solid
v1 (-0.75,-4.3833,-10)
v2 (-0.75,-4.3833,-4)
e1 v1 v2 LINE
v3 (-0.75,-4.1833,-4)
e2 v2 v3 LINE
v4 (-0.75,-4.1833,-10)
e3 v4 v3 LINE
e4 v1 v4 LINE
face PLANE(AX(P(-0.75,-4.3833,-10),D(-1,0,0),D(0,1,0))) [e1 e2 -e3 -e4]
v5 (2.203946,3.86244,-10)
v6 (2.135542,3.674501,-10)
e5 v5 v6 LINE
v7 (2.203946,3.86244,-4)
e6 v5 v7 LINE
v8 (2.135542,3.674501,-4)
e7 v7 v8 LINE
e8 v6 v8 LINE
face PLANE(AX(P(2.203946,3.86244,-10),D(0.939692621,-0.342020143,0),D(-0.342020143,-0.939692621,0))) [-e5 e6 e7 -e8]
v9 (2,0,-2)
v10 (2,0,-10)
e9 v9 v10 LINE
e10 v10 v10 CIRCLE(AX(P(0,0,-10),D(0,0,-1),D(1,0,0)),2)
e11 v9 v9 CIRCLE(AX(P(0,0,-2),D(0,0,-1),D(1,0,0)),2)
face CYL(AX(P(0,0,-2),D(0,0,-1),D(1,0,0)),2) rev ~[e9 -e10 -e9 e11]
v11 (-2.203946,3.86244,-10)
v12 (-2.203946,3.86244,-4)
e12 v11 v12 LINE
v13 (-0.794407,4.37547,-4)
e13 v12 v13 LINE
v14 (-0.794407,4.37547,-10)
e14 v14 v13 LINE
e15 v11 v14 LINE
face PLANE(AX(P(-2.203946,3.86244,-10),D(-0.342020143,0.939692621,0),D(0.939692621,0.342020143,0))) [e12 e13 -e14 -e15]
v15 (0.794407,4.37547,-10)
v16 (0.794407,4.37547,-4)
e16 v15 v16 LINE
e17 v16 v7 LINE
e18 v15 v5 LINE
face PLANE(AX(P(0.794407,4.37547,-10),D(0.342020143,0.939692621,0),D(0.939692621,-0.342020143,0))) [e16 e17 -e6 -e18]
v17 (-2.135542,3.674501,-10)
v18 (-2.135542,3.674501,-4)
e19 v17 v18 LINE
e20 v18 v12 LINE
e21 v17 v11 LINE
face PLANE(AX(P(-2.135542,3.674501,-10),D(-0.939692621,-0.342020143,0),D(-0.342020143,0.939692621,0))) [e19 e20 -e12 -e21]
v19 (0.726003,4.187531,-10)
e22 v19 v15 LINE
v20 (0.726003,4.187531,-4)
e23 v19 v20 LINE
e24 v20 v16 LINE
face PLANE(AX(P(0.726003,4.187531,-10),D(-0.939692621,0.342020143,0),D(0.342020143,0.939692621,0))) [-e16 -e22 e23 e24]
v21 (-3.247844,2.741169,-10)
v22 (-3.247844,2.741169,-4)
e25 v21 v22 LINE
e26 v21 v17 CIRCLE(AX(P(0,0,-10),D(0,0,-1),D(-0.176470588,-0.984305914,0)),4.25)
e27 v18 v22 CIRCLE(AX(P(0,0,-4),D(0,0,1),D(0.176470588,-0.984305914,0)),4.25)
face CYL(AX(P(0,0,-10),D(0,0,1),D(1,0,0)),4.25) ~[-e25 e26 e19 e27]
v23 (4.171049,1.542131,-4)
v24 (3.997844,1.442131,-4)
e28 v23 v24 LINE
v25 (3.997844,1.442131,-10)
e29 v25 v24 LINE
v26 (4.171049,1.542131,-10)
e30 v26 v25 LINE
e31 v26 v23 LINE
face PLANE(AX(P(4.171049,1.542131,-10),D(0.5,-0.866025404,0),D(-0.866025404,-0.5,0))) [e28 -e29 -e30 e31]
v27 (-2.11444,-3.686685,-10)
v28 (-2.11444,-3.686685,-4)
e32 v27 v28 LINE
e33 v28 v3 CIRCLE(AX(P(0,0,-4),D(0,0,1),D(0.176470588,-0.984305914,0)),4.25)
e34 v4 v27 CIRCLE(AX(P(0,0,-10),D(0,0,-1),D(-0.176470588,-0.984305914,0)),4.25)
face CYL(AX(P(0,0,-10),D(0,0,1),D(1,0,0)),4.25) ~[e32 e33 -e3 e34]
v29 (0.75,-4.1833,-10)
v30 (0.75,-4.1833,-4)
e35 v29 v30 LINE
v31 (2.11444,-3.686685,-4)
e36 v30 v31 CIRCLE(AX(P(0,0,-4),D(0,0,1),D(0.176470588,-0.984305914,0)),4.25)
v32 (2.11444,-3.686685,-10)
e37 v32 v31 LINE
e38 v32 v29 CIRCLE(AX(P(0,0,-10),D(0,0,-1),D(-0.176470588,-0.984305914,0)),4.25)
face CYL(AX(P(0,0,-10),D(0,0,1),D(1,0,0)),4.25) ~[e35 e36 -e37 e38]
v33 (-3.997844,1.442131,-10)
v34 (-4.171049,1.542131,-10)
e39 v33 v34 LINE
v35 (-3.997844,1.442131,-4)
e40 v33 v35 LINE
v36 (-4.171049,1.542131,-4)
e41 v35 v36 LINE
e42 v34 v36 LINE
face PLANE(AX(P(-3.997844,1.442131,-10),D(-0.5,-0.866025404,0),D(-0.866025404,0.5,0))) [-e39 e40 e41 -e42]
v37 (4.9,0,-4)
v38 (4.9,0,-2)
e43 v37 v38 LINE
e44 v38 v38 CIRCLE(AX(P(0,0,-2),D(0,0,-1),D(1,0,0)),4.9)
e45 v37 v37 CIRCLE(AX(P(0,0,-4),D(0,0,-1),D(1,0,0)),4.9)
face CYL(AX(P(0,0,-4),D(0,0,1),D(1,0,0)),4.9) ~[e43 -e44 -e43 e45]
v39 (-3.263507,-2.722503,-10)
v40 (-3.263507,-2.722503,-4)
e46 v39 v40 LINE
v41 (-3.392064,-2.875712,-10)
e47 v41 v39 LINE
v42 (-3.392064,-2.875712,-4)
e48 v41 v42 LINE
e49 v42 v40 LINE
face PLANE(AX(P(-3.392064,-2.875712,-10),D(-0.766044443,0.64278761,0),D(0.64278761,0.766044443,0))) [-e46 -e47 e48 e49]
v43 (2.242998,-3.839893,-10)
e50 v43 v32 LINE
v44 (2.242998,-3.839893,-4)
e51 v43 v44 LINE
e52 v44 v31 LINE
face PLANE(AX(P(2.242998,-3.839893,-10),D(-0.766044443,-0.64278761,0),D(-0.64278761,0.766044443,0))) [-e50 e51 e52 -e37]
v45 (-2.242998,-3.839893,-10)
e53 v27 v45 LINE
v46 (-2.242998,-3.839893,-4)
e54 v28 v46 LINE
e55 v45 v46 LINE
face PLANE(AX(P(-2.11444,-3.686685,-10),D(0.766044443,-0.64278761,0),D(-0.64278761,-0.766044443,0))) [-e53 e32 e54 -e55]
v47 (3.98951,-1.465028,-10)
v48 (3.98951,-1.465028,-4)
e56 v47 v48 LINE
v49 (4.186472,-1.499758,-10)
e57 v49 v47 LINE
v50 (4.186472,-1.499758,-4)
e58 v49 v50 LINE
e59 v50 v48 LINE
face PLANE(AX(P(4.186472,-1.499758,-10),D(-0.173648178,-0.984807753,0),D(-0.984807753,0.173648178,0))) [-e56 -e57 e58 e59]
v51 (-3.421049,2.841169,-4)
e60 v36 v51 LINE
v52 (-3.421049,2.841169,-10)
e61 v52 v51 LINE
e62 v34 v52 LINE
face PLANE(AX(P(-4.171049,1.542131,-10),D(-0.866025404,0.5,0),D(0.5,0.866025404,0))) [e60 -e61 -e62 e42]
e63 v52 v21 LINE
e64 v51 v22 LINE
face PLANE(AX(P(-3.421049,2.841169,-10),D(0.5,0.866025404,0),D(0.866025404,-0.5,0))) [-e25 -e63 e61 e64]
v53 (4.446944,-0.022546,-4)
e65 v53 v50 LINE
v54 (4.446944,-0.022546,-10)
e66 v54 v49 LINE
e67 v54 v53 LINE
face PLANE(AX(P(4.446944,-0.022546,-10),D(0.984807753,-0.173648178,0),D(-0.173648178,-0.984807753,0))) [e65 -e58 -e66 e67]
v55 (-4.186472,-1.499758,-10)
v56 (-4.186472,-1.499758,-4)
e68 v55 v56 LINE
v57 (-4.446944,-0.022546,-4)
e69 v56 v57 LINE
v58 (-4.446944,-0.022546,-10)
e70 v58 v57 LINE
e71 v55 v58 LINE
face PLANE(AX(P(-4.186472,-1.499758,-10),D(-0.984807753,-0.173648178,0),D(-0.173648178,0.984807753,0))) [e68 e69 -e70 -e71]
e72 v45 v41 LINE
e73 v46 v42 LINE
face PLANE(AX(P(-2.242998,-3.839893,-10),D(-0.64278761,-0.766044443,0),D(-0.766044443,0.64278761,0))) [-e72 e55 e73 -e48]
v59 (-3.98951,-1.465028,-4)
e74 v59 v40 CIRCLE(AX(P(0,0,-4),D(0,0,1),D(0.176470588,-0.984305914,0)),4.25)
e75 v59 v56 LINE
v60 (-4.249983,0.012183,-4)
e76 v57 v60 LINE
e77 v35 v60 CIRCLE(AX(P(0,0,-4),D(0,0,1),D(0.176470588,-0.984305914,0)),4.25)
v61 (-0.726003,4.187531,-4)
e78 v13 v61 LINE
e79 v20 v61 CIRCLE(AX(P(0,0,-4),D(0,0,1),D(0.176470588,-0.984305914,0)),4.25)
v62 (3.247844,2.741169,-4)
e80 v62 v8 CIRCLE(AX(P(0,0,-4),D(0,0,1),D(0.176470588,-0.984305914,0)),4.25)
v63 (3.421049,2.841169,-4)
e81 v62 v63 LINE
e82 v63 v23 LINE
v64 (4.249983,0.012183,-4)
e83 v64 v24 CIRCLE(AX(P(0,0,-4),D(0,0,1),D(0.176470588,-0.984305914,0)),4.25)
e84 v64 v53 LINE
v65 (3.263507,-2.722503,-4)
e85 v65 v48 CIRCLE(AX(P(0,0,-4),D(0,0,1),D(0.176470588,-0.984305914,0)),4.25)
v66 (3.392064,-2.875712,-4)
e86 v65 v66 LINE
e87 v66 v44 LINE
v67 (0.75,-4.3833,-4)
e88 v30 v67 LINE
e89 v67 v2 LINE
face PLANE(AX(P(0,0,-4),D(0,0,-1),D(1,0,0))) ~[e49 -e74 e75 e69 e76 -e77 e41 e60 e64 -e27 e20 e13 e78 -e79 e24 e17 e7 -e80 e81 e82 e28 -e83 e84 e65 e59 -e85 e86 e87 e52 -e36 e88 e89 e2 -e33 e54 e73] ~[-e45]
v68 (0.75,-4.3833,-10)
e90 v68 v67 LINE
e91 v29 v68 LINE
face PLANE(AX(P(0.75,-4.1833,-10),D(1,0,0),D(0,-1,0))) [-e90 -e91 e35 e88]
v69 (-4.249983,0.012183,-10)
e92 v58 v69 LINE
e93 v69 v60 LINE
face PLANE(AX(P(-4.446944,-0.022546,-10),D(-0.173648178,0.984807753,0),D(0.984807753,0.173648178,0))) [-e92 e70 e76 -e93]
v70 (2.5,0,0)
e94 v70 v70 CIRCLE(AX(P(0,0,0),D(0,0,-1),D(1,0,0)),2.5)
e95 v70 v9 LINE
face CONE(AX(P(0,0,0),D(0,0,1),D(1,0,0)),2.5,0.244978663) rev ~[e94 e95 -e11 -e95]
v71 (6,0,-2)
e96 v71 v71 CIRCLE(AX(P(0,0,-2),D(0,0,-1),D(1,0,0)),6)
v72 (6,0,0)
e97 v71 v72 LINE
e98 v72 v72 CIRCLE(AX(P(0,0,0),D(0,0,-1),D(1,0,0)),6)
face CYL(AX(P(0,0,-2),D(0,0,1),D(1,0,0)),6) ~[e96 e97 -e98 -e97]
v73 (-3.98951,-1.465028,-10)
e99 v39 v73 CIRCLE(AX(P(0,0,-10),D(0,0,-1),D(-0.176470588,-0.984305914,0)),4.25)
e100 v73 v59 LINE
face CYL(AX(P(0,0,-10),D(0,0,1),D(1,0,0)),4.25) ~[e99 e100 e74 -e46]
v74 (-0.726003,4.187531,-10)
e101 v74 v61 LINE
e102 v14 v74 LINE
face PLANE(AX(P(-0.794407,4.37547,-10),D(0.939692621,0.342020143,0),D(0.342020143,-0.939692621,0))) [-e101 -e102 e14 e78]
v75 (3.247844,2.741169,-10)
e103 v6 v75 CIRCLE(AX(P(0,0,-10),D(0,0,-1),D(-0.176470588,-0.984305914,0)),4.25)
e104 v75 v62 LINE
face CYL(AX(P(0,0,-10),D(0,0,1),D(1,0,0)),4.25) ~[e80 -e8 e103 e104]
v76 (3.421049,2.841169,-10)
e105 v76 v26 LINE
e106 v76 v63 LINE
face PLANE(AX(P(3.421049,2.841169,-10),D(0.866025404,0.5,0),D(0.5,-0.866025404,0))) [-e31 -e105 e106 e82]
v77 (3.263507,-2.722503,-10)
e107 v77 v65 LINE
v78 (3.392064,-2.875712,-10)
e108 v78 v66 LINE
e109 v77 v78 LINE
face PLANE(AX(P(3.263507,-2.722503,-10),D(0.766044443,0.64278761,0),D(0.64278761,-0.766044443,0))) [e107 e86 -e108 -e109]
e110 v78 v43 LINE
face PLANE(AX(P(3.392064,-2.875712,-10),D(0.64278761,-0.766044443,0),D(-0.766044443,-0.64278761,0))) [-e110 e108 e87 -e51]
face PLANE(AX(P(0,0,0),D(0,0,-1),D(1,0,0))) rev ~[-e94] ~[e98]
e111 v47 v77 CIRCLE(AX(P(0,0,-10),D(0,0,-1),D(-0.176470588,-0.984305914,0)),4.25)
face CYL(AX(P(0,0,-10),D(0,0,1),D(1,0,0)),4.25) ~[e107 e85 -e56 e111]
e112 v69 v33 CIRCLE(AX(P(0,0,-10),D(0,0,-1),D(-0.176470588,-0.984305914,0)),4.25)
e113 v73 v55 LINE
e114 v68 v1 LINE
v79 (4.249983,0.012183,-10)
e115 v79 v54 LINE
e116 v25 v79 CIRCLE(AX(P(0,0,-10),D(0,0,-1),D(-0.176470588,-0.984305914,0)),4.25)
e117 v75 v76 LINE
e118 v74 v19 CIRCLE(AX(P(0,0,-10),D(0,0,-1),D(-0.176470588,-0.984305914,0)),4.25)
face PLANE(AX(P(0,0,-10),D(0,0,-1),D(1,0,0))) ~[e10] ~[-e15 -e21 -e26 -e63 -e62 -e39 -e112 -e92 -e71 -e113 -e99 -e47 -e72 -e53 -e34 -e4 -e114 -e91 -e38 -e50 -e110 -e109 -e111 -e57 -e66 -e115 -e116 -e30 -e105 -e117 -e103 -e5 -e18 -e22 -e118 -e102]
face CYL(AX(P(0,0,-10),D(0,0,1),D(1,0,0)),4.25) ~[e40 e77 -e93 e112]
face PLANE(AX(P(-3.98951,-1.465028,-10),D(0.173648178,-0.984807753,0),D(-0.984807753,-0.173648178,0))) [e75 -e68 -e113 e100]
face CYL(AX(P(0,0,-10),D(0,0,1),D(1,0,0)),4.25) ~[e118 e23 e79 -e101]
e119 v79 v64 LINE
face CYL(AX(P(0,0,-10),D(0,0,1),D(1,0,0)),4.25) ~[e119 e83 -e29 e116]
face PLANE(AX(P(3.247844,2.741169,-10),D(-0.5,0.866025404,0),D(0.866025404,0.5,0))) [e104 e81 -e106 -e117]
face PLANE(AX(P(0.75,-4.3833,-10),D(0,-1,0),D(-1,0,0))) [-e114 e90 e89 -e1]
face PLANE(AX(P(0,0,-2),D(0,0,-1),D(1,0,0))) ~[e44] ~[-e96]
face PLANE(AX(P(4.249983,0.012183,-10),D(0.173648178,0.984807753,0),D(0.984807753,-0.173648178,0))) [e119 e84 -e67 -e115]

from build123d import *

# Parameters (mm, degrees)
F3_DEPTH        = 6
F3_COPIES_COUNT = 9


# Not quite as in the source:
# - a pattern or mirror of a feature is missing from the dataset's text; its kind, count and spacing are read off the source's solid


with BuildPart() as f1:
    # F0 (on Front) → F1 (revolve)
    with BuildSketch(Plane.XZ):
        Polygon((6, 0), (2.5, 0), (2, -2), (2, -10), (4.25, -10), (4.25, -4), (4.9, -4), (4.9, -2), (6, -2), align=None)
    revolve(axis=Axis((0, 0, -12.1953526796), (0, 0, -1)))

    # F2 (on face) → F3 (join, through all)
    with BuildSketch(Plane(origin=(0, 0, -10), x_dir=(1, 0, 0), z_dir=(0, 0, -1))):
        with BuildLine():
            ThreePointArc((-0.75, 4.1833001327), (0, 4.25), (0.75, 4.1833001327))
            Line((0.75, 4.1833001327), (0.75, 4.3833001327))
            Line((0.75, 4.3833001327), (-0.75, 4.3833001327))
            Line((-0.75, 4.3833001327), (-0.75, 4.1833001327))
        make_face()
    f3 = extrude(amount=-F3_DEPTH)

    # F3_copies: F3 ×9 about axis
    f3_copies_axis = Axis((0, 0, 0), (0, 0, 1))
    for i in range(1, F3_COPIES_COUNT):
        add(f3.rotate(f3_copies_axis, i * 360 / F3_COPIES_COUNT))


solid = f1.part
